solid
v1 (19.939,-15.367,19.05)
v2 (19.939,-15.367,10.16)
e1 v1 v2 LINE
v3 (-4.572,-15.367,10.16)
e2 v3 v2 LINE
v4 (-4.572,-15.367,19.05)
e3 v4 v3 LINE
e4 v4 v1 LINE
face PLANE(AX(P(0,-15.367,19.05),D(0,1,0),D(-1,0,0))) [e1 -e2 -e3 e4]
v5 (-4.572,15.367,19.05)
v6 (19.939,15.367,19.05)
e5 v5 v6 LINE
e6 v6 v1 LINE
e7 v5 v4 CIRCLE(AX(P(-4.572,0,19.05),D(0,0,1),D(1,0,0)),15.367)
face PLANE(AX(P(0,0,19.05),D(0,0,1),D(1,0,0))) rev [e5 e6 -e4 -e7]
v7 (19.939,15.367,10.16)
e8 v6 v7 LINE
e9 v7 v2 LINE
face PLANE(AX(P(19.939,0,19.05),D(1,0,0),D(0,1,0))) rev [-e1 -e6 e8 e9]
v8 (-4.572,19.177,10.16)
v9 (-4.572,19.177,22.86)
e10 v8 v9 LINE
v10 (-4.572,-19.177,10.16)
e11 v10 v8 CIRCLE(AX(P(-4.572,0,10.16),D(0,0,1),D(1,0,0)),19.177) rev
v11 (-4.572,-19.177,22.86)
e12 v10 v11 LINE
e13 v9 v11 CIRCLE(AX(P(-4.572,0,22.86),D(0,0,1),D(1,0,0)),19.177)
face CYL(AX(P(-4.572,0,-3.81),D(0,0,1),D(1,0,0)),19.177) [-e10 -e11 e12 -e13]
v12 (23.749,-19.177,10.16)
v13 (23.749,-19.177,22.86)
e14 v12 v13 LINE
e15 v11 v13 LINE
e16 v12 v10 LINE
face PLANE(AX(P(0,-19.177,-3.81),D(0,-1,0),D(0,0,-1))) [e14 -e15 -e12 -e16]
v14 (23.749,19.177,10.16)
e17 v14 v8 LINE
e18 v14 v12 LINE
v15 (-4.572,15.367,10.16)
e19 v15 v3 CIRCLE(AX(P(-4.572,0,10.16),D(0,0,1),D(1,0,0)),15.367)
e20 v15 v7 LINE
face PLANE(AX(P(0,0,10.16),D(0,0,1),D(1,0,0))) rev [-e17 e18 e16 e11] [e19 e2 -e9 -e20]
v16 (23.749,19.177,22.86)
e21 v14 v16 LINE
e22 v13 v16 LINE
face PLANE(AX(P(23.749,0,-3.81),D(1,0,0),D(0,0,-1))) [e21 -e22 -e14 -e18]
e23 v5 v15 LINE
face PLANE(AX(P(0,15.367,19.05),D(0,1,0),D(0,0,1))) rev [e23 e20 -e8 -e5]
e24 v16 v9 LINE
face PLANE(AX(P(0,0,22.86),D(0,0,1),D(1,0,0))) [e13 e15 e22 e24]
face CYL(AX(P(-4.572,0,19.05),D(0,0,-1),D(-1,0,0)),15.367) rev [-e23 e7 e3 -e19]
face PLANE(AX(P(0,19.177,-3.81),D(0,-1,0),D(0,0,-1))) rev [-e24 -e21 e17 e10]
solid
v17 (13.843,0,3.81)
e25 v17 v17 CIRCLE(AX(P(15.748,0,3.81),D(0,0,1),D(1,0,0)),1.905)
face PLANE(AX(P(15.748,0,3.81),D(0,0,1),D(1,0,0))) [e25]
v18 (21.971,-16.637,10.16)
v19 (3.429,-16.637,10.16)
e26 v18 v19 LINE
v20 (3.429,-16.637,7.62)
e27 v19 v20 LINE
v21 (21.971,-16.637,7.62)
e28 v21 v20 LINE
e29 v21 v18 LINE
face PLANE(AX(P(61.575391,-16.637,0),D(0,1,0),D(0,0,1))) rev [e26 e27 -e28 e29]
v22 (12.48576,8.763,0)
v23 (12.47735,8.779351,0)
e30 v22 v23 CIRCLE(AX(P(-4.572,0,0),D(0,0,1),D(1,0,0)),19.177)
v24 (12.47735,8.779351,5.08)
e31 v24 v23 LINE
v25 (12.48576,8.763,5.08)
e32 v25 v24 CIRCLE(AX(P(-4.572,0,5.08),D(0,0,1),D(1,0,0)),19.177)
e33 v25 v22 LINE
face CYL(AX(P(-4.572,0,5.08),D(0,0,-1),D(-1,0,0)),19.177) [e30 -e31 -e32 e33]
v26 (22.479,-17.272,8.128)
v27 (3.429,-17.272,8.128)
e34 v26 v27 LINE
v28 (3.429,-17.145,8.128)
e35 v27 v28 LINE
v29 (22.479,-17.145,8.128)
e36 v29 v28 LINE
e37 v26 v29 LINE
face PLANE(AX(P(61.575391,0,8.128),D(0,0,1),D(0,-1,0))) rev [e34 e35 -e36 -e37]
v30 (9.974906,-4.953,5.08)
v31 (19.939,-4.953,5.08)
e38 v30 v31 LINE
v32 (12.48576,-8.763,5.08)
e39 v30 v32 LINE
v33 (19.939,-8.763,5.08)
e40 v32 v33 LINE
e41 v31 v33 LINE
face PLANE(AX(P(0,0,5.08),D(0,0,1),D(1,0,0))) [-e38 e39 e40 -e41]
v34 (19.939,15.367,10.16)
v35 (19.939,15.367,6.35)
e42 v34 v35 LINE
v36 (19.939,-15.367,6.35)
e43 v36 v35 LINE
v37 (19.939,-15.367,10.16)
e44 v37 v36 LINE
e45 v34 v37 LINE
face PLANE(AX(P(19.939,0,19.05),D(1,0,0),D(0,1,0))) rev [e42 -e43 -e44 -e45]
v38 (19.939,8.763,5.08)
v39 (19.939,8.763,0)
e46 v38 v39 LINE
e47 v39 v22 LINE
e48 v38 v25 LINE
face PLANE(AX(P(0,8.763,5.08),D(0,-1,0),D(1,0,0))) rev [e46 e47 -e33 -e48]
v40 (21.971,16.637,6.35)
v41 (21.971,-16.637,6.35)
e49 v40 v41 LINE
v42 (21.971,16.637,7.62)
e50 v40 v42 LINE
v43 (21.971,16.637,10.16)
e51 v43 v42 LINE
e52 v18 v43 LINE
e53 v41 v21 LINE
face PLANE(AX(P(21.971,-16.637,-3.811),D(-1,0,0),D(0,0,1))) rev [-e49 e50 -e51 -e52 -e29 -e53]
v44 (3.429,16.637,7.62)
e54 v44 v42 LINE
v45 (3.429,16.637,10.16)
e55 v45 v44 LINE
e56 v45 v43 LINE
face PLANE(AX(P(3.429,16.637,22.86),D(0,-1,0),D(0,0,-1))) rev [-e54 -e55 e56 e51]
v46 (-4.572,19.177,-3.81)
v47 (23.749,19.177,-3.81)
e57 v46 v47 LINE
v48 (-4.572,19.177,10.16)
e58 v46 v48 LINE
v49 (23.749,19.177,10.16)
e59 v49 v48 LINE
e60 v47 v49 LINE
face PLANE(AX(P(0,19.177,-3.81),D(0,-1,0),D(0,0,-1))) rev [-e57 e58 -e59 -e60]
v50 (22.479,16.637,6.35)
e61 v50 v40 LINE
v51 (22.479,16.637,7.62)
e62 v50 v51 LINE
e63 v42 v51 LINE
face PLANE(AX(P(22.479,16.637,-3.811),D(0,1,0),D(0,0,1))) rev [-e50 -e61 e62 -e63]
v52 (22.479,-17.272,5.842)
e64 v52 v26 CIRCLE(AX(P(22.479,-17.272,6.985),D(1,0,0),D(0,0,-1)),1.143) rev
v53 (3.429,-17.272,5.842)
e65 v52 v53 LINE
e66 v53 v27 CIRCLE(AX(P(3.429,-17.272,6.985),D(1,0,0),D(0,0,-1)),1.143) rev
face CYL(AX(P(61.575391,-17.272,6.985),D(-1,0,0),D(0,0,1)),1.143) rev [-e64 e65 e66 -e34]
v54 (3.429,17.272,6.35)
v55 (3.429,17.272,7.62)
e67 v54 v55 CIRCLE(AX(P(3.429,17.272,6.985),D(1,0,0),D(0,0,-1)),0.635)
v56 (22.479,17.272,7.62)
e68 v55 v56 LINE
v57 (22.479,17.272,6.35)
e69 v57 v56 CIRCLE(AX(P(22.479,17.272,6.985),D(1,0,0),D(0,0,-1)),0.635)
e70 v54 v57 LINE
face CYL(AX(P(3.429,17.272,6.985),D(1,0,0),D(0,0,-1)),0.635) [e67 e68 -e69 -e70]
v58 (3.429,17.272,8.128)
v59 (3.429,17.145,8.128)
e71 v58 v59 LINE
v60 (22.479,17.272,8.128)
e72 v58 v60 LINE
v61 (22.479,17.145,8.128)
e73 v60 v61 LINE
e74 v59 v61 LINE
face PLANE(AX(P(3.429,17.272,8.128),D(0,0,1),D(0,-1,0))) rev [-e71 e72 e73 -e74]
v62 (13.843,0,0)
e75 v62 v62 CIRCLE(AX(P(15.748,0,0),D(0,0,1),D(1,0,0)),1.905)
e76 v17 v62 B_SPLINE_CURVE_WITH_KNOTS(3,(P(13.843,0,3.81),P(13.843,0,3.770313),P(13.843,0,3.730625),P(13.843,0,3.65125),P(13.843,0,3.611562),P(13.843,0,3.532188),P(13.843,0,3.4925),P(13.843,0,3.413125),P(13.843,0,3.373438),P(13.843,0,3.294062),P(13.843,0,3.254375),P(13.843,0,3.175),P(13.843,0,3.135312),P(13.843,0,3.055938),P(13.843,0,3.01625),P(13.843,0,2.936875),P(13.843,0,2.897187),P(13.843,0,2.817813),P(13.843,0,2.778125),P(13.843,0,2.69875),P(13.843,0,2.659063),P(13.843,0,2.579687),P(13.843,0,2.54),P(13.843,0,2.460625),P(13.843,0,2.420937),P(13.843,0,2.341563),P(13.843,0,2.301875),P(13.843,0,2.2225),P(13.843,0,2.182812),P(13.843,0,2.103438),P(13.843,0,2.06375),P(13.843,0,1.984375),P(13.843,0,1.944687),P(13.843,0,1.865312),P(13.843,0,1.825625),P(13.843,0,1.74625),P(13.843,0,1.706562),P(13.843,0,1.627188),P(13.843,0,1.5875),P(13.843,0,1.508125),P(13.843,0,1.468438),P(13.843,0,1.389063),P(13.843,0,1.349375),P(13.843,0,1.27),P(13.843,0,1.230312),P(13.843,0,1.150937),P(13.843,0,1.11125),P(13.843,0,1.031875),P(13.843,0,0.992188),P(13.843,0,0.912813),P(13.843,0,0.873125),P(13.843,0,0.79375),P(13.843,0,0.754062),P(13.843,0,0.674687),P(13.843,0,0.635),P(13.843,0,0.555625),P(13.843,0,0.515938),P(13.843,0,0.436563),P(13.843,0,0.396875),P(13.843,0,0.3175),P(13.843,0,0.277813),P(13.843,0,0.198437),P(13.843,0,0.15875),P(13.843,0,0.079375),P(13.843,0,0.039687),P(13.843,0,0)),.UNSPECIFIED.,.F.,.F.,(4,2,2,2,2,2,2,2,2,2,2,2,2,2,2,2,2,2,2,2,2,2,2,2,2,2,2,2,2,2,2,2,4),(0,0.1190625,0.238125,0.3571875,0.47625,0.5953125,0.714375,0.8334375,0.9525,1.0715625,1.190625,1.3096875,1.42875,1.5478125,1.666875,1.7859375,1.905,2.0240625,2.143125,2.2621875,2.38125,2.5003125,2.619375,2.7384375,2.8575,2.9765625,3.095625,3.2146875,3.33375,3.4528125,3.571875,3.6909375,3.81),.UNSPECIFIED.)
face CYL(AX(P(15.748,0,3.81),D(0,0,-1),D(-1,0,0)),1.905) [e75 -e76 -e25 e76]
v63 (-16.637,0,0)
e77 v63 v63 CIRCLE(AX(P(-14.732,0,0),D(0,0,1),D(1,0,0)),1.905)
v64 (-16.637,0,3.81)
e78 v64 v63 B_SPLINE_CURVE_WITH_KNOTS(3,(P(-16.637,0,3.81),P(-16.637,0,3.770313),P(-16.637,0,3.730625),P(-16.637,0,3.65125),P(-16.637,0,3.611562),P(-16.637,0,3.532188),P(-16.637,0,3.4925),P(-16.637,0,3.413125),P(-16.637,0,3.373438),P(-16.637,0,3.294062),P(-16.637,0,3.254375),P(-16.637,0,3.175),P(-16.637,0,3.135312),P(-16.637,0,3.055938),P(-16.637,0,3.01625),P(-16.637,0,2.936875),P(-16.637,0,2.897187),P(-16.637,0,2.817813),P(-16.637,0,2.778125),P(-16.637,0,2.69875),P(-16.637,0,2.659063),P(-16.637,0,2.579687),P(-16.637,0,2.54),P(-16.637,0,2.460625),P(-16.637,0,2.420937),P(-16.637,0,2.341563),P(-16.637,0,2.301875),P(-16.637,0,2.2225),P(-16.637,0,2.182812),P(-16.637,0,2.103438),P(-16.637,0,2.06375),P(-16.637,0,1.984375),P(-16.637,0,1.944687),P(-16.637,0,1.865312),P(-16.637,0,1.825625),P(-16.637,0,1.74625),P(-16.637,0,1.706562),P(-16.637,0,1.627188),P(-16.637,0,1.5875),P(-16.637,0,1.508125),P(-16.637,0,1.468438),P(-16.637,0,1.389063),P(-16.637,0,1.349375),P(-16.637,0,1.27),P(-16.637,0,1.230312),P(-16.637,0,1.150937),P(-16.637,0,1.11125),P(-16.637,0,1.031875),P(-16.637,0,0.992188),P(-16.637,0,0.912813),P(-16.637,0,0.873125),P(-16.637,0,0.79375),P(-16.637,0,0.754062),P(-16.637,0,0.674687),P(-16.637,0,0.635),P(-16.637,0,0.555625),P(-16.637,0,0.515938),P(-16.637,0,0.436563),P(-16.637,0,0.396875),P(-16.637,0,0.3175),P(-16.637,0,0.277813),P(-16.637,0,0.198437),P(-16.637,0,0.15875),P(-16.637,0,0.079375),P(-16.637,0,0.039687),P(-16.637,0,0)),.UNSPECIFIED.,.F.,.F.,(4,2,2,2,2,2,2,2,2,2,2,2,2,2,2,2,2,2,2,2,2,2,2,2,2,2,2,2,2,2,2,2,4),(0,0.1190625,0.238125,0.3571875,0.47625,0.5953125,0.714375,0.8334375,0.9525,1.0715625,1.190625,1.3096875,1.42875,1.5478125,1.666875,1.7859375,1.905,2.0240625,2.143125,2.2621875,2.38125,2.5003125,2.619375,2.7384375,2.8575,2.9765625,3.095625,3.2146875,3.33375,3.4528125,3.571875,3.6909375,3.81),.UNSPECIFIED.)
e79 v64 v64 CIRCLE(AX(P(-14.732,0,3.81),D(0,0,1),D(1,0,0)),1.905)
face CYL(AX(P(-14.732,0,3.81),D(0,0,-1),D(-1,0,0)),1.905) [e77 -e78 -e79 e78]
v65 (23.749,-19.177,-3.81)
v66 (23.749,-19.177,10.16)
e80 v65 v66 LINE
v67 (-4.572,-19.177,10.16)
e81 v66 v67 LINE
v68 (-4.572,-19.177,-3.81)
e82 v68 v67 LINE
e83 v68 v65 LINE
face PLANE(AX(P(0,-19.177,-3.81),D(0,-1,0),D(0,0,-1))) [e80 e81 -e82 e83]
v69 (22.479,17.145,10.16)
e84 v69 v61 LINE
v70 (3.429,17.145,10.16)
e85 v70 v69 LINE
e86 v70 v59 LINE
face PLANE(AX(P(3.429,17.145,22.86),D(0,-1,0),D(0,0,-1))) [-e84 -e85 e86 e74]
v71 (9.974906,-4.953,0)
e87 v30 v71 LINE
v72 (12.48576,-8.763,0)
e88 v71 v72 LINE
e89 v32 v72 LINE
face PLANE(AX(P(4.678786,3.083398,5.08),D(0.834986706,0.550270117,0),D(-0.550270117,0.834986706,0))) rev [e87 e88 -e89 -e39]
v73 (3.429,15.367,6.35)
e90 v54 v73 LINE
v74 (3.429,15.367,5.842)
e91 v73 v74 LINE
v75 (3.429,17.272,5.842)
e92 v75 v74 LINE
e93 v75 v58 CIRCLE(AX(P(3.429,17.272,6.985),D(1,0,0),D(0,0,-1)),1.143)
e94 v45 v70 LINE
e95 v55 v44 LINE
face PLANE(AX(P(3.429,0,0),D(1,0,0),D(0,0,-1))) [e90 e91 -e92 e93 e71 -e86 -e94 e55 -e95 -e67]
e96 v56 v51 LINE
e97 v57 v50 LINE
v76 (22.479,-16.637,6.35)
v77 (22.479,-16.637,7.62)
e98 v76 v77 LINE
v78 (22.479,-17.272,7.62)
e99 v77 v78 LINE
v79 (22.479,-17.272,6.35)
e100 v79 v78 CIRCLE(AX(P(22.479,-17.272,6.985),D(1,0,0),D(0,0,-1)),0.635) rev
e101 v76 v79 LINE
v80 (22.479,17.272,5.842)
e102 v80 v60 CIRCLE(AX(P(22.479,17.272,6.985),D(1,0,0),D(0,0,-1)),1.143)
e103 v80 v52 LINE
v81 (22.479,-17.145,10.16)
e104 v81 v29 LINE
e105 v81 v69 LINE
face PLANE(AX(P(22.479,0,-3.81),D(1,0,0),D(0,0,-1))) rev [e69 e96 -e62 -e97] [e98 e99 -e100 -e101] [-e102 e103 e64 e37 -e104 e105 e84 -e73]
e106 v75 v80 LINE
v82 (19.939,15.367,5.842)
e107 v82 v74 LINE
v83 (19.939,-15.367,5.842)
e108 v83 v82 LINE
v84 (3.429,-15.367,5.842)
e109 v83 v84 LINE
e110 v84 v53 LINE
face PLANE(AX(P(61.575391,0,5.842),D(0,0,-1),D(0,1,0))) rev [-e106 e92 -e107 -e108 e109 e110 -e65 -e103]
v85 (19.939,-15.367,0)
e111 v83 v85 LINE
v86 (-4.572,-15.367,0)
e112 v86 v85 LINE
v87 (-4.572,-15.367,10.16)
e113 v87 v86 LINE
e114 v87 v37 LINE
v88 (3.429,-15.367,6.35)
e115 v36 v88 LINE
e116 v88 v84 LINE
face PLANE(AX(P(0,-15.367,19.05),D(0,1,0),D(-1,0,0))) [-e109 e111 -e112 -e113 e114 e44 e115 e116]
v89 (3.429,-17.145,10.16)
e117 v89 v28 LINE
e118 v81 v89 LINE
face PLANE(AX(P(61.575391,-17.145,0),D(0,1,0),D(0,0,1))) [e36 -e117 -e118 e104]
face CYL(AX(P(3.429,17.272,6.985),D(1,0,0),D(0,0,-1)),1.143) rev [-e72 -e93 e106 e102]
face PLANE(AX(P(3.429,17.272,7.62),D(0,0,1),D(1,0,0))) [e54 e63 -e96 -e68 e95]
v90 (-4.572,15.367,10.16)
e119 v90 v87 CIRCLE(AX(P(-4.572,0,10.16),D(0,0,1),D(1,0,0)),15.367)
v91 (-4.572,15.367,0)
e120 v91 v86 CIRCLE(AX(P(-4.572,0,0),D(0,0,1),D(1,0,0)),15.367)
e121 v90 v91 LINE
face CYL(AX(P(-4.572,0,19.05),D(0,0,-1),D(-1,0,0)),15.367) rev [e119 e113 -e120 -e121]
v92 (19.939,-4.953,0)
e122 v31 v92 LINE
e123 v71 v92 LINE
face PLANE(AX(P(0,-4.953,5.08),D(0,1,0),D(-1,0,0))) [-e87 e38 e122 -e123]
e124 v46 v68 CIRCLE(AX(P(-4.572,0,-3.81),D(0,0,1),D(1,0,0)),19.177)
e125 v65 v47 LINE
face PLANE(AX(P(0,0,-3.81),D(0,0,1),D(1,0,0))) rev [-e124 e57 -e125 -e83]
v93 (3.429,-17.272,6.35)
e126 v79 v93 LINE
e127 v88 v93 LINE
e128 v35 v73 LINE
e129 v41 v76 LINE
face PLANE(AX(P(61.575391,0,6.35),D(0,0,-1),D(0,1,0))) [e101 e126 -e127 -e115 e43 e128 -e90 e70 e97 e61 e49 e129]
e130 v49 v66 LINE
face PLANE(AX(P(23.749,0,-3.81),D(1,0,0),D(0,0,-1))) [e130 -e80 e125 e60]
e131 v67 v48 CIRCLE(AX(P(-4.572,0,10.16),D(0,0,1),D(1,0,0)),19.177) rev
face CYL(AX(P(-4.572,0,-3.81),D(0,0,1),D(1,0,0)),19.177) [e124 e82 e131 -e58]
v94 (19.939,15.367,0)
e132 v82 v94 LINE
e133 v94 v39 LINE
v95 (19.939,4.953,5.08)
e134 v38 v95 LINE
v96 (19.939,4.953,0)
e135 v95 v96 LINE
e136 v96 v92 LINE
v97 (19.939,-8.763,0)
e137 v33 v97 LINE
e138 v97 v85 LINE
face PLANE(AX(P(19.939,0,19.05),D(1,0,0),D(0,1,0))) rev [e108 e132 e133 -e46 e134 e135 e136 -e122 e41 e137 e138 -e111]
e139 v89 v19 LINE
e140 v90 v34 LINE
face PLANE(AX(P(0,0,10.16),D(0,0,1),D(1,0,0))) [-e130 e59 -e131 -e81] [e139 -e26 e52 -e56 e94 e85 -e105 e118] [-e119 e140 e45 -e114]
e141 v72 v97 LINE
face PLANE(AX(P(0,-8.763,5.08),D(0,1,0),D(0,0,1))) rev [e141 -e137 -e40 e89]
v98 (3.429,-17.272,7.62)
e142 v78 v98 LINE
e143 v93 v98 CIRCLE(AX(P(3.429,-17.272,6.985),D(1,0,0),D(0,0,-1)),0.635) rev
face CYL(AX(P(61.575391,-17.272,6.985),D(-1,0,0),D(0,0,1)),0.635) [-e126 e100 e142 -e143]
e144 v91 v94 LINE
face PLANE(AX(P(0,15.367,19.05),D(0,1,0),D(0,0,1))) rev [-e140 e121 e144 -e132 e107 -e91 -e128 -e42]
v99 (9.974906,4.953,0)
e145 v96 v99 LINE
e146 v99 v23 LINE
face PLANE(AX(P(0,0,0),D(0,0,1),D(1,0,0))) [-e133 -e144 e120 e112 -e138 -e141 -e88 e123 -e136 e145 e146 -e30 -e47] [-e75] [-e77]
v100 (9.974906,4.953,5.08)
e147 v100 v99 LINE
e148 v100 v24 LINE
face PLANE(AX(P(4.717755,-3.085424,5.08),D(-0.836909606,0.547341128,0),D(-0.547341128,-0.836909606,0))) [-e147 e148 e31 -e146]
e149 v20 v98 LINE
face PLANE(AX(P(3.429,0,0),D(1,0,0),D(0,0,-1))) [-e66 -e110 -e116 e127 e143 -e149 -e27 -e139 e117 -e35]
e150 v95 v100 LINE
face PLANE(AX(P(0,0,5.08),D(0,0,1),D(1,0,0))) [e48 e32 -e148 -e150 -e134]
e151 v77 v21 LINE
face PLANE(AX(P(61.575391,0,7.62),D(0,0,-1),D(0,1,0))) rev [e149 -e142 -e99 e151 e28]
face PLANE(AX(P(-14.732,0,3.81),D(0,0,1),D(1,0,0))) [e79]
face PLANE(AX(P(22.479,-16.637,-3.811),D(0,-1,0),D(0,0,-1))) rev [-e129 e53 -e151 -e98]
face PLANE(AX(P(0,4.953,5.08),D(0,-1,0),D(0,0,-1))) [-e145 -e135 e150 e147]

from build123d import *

# Parameters (mm, degrees)
BASE_EXTRUDE_DEPTH      = 3.81
WALLS_START             = 19.05
WALLS_EXTRUDE_DEPTH     = 19.05
TOP_START               = 3.81
TOP_EXTRUDE_DEPTH       = 3.81
BOARD_START             = 5.08
BOARD_HOLDERS_DEPTH     = 5.08
STANDOFFS_R             = 1.905
BOSS_EXTRUDE5_DEPTH     = 3.81
CUT_EXTRUDE1_START      = -5.08
CUT_EXTRUDE1_DEPTH      = 19.05
CUT_EXTRUDE2_DEPTH      = 1.27
CUT_EXTRUDE2_DEPTH_BACK = 11.43
BACK_EDGE_CUTOUT_W      = 0.508
BACK_EDGE_CUTOUT_H      = 33.274


# Read off the part's stored shape, not the designer's step: Cut-Extrude1
with BuildPart() as part:
    # walls → Base extrude (new body)
    with BuildSketch(Plane.XY):
        with BuildLine():
            Line((23.749, -19.177), (23.749, 19.177))
            Line((23.749, 19.177), (-4.572, 19.177))
            ThreePointArc((-4.572, 19.177), (-23.749, 0), (-4.572, -19.177))
            Line((-4.572, -19.177), (23.749, -19.177))
        make_face()
    extrude(amount=-BASE_EXTRUDE_DEPTH)

    # walls<4> → Walls Extrude (add)
    with BuildSketch(Plane.XY.offset(WALLS_START)):
        with BuildLine():
            Line((23.749, -19.177), (23.749, -8.763))
            Line((23.749, -8.763), (23.749, 8.763))
            Line((23.749, 8.763), (23.749, 19.177))
            Line((23.749, 19.177), (-4.572, 19.177))
            ThreePointArc((-4.572, 19.177), (-23.749, 0), (-4.572, -19.177))
            Line((-4.572, -19.177), (23.749, -19.177))
        make_face()
        with BuildLine():
            ThreePointArc((-4.572, -15.367), (-19.939, 0), (-4.572, 15.367))
            Line((-4.572, 15.367), (19.939, 15.367))
            Line((19.939, 15.367), (19.939, 8.763))
            Line((19.939, 8.763), (19.939, 4.953))
            Line((19.939, 4.953), (19.939, -4.953))
            Line((19.939, -4.953), (19.939, -8.763))
            Line((19.939, -8.763), (19.939, -15.367))
            Line((19.939, -15.367), (-4.572, -15.367))
        make_face(mode=Mode.SUBTRACT)
    extrude(amount=-WALLS_EXTRUDE_DEPTH)

    # Sketch2 → Top Extrude (add)
    with BuildSketch(Plane.XY.offset(19.05).offset(TOP_START)):
        with BuildLine():
            Line((23.749, 19.177), (-4.572, 19.177))
            ThreePointArc((-4.572, 19.177), (-23.749, 0), (-4.572, -19.177))
            Line((-4.572, -19.177), (23.749, -19.177))
            Line((23.749, -19.177), (23.749, 19.177))
        make_face()
    extrude(amount=-TOP_EXTRUDE_DEPTH)

    # walls<5> → board holders (add)
    with BuildSketch(Plane.XY.offset(BOARD_START)):
        with BuildLine():
            Line((12.477349839, 8.77935072), (9.9749062, 4.953))
            Line((9.9749062, 4.953), (19.939, 4.953))
            Line((19.939, 4.953), (19.939, 8.763))
            Line((19.939, 8.763), (12.485759525, 8.763))
            ThreePointArc((12.485759525, 8.763), (12.481556641, 8.771176368), (12.477349839, 8.77935072))
        make_face()
        Polygon((19.939, -4.953), (9.9749062, -4.953), (12.485759525, -8.763), (19.939, -8.763), align=None)
    extrude(amount=-BOARD_HOLDERS_DEPTH)

    # standoffs → Boss-Extrude5 (add)
    with BuildSketch(Plane.XY):
        with Locations(Location((15.748, 0, 0), (0, 0, 180))):
            Circle(STANDOFFS_R)
        with Locations(Location((-14.732, 0, 0), (0, 0, 180))):
            Circle(STANDOFFS_R)
    extrude(amount=BOSS_EXTRUDE5_DEPTH)


with BuildPart() as body_2:
    # Split1: the piece on the far side of the plane
    add(part.part)
    split(bisect_by=Plane.XY.offset(10.16), keep=Keep.BOTTOM)

    # Cut-Extrude1 outline → Cut-Extrude1 (cut)
    with BuildSketch(Plane(origin=(8.509, 0, 0), x_dir=(0, 0, -1), z_dir=(1, 0, 0)).offset(CUT_EXTRUDE1_START)):
        with BuildLine():
            ThreePointArc((-8.128, -17.272), (-6.985, -18.415), (-5.842, -17.272))
            Line((-5.842, -17.272), (-5.842, 17.272))
            ThreePointArc((-5.842, 17.272), (-6.985, 18.415), (-8.128, 17.272))
            Line((-8.128, 17.272), (-8.128, 17.145))
            Line((-8.128, 17.145), (-10.16, 17.145))
            Line((-10.16, 17.145), (-10.16, 16.637))
            Line((-10.16, 16.637), (-7.62, 16.637))
            Line((-7.62, 16.637), (-7.62, 17.272))
            ThreePointArc((-7.62, 17.272), (-6.985, 17.907), (-6.35, 17.272))
            Line((-6.35, 17.272), (-6.35, -17.272))
            ThreePointArc((-6.35, -17.272), (-6.985, -17.907), (-7.62, -17.272))
            Line((-7.62, -17.272), (-7.62, -16.637))
            Line((-7.62, -16.637), (-10.16, -16.637))
            Line((-10.16, -16.637), (-10.16, -17.145))
            Line((-10.16, -17.145), (-8.128, -17.145))
            Line((-8.128, -17.145), (-8.128, -17.272))
        make_face()
    extrude(amount=CUT_EXTRUDE1_DEPTH, mode=Mode.SUBTRACT)

    # back edge cutout → Cut-Extrude2 (cut, two sides: drawn at the far end of the back side and taken through both)
    with BuildSketch(Plane.XY.offset(17.78).offset(-CUT_EXTRUDE2_DEPTH_BACK)):
        with Locations((22.225, 0)):
            Rectangle(BACK_EDGE_CUTOUT_W, BACK_EDGE_CUTOUT_H)
    extrude(amount=CUT_EXTRUDE2_DEPTH + CUT_EXTRUDE2_DEPTH_BACK, mode=Mode.SUBTRACT)


with BuildPart() as part_1:
    add(part.part)

    # Split1
    split(bisect_by=Plane.XY.offset(10.16), keep=Keep.TOP)


solid = Compound([body_2.part, part_1.part])
